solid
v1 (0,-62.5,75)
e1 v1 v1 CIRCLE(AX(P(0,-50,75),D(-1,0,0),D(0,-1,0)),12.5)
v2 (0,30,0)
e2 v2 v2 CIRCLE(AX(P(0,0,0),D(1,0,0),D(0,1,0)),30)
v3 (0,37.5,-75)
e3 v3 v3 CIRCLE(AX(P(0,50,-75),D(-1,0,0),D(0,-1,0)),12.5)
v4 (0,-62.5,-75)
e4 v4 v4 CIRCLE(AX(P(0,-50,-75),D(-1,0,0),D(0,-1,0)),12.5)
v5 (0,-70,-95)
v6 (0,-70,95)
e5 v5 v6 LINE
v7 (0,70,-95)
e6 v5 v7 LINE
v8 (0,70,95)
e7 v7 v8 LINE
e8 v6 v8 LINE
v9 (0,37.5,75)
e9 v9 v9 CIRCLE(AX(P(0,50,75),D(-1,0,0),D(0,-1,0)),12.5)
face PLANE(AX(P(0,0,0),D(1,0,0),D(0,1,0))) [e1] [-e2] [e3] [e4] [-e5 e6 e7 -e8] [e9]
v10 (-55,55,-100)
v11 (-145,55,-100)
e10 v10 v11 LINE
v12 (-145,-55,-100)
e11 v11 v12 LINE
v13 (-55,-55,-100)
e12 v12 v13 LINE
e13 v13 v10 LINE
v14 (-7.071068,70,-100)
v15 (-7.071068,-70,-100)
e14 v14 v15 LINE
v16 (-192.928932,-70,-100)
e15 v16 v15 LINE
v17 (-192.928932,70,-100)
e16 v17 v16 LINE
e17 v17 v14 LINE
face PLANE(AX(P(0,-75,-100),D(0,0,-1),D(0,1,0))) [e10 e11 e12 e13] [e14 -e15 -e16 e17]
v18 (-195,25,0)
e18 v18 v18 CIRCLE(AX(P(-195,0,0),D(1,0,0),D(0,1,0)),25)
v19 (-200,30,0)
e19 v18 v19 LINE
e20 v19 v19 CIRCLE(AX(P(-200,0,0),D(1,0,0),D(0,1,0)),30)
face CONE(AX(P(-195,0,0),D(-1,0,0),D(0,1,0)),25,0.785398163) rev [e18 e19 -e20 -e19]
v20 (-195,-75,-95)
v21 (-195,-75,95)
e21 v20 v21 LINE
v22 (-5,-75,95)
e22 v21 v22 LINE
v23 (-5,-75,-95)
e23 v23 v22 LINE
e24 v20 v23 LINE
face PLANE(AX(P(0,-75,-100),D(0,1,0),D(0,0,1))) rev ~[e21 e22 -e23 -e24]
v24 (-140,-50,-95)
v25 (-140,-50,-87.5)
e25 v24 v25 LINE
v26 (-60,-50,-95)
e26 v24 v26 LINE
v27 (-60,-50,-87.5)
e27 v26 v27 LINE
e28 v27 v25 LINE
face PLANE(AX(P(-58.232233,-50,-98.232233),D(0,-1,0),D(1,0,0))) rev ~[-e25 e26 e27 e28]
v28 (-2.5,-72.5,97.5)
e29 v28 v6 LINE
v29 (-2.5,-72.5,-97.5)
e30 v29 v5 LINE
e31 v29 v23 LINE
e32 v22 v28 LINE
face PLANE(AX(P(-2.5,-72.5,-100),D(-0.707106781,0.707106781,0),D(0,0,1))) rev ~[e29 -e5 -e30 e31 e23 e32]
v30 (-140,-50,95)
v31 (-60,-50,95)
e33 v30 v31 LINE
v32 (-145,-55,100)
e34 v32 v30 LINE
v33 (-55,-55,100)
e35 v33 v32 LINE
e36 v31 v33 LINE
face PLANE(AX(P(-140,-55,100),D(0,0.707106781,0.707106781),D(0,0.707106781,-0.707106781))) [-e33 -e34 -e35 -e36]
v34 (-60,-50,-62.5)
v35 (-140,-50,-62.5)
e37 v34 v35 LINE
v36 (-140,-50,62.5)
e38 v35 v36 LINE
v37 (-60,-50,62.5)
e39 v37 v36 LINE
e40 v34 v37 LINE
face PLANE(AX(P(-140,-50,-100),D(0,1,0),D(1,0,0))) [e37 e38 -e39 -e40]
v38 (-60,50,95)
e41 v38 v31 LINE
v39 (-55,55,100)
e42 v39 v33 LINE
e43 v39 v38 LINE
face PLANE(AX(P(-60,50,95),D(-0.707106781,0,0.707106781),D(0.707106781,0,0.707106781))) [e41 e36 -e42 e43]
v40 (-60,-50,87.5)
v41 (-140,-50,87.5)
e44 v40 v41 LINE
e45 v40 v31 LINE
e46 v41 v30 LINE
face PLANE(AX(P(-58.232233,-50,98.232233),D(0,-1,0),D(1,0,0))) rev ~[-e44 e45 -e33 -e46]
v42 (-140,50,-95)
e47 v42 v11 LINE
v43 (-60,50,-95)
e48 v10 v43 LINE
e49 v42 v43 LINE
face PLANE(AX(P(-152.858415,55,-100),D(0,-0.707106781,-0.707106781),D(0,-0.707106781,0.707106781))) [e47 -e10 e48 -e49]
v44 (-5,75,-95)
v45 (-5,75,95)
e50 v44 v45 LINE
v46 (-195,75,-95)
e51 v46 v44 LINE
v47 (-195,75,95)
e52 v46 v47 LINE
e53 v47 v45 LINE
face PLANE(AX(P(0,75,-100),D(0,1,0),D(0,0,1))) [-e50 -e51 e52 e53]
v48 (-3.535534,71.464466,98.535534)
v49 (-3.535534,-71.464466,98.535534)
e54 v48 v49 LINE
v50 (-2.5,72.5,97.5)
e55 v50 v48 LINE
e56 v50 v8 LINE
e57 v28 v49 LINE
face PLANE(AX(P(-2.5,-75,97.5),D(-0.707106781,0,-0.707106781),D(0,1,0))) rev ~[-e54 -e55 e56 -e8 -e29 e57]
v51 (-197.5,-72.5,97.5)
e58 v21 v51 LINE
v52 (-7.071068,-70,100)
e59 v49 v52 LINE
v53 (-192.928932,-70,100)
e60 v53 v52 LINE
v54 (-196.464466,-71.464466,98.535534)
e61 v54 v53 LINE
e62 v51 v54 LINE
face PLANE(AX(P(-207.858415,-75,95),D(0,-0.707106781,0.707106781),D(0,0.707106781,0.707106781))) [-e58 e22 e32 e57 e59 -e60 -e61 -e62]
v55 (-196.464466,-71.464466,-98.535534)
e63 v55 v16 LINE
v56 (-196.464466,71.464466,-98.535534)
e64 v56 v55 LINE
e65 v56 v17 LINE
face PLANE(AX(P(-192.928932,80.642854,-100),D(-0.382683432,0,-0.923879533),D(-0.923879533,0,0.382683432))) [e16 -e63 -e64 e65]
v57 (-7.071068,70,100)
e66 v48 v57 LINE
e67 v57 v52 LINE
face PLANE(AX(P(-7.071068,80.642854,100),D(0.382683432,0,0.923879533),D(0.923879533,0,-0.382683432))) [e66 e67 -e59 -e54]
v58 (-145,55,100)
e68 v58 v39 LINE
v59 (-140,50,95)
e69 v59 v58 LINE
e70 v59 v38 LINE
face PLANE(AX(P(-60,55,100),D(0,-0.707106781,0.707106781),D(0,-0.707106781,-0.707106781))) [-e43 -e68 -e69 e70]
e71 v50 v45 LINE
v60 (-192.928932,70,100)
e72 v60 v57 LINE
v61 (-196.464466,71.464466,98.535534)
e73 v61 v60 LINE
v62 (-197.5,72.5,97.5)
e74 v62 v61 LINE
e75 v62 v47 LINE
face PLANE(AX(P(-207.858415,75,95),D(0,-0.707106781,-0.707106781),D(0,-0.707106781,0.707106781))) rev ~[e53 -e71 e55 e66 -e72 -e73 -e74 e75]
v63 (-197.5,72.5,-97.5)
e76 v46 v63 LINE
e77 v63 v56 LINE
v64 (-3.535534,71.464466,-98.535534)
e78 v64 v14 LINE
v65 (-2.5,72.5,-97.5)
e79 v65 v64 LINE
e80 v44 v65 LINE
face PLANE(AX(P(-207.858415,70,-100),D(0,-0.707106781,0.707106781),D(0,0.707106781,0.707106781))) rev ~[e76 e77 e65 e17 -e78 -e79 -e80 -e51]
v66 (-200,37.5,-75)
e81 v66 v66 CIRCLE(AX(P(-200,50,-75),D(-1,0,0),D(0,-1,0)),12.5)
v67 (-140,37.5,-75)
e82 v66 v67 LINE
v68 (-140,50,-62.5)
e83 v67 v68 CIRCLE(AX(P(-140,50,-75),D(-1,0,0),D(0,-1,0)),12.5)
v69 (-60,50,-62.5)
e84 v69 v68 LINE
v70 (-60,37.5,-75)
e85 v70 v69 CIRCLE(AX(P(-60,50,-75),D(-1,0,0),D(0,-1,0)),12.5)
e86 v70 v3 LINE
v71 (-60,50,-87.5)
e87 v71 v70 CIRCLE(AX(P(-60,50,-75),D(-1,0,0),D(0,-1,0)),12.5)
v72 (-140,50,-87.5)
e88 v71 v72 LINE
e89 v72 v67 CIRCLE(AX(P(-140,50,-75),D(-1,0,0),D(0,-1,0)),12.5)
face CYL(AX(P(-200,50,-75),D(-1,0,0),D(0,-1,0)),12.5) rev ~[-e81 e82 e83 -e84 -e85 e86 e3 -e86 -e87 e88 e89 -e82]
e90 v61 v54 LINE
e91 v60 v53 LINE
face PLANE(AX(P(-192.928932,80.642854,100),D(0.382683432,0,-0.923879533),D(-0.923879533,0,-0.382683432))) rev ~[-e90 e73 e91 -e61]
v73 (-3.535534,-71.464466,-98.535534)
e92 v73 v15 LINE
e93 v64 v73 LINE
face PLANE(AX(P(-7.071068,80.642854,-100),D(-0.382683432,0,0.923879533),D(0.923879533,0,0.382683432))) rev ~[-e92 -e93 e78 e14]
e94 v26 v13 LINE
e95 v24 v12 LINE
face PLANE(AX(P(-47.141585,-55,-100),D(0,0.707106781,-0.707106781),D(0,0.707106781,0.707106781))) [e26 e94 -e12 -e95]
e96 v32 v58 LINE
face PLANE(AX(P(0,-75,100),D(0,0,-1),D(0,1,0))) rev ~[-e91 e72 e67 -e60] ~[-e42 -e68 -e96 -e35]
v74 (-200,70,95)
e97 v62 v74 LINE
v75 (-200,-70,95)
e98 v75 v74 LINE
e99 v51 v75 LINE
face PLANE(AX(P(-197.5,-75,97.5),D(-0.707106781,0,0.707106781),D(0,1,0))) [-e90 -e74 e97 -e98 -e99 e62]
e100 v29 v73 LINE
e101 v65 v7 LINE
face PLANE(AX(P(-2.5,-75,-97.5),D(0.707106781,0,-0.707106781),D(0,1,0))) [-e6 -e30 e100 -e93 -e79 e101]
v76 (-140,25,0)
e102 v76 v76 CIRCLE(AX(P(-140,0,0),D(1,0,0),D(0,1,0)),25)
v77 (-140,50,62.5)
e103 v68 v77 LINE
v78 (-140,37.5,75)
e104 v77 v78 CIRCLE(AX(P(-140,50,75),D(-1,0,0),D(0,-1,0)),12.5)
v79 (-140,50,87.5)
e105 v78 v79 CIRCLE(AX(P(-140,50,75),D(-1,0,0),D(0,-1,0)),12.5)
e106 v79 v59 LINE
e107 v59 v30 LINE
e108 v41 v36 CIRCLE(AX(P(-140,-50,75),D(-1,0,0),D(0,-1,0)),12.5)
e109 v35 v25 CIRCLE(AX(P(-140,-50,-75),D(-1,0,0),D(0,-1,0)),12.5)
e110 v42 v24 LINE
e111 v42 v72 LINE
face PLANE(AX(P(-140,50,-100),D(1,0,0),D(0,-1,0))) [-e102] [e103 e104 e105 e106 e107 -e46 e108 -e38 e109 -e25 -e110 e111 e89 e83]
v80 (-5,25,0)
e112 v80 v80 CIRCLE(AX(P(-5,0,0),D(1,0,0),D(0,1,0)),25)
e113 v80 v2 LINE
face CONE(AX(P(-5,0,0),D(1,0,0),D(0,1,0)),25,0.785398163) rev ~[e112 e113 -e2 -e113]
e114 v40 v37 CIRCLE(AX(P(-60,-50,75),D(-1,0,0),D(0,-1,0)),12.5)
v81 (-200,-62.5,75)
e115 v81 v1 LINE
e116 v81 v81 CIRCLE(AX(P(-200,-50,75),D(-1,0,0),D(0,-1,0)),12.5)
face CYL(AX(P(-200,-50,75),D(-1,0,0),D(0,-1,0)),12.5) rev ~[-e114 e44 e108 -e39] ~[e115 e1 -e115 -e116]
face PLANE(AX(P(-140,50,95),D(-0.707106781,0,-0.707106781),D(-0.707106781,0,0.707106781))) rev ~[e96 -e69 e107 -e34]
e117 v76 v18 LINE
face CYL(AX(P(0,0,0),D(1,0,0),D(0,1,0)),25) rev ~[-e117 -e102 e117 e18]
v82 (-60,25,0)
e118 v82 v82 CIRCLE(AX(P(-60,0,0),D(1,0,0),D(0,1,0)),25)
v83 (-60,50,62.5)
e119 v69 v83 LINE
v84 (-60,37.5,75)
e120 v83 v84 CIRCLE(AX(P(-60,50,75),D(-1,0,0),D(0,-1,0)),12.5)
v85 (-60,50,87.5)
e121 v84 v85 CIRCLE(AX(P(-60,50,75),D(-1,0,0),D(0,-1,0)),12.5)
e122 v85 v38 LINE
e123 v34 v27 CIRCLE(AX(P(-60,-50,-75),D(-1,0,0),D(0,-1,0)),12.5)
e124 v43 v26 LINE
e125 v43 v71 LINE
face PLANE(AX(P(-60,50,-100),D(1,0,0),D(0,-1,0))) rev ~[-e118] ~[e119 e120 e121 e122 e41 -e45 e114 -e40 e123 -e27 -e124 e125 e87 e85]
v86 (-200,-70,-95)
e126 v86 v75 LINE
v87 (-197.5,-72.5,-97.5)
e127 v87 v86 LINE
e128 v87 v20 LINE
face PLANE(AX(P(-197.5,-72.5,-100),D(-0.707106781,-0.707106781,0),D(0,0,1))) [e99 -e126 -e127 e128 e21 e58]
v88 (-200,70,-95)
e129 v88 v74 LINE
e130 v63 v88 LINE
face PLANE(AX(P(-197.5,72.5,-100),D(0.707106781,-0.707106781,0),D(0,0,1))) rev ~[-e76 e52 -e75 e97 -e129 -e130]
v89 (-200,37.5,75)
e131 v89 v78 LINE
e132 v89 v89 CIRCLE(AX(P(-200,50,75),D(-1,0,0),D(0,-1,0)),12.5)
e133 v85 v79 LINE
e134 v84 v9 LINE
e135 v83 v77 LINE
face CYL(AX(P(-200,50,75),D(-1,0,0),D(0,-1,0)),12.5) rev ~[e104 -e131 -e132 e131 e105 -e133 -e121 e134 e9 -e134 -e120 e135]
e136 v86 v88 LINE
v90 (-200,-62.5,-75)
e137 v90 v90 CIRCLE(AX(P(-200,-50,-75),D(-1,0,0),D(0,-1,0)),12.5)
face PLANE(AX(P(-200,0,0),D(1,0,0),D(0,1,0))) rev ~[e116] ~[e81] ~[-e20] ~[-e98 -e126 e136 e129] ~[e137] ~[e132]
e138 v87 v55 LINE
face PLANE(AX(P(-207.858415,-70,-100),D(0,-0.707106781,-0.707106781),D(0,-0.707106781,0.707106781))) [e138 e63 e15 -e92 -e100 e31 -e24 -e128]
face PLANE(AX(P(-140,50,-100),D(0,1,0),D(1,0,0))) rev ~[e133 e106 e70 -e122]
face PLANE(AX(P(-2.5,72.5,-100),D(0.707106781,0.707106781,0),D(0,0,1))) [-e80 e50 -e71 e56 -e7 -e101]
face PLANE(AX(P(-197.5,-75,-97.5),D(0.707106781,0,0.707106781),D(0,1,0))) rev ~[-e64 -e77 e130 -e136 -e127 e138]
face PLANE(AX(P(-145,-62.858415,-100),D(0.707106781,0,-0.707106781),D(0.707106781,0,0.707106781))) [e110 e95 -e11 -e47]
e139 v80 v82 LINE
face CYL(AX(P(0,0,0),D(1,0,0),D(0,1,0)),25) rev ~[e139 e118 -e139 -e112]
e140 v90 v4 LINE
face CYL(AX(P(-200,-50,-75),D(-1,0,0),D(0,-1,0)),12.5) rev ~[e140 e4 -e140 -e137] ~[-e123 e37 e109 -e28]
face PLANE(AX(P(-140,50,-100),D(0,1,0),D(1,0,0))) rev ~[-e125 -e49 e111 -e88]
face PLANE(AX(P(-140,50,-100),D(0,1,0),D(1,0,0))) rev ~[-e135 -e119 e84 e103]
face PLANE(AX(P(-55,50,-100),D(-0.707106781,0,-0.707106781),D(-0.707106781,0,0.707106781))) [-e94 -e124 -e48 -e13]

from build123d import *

# Parameters (mm, degrees)
F0_W         = 150
F0_H         = 200
F0_R         = 25
F1_DEPTH     = 200
F2_SIZE      = 5
F3_R         = 12.5
F4_DEPTH     = 200.001
F5_W         = 80
F5_H         = 100
F6_DEPTH     = 200.001
F7_T1_DEPTH  = 215.7168298797
F7_T3_DEPTH  = 161.2857086021
F7_T5_DEPTH  = 100
F7_T7_DEPTH  = 80
F7_T13_DEPTH = 112.8584149398
F7_T17_DEPTH = 92.8584149398
F7_T24_DEPTH = 112.8584149398
F7_T28_DEPTH = 92.8584149398
F7_T35_DEPTH = 92.8584149398
F7_T39_DEPTH = 112.8584149398
F7_T46_DEPTH = 112.8584149398
F7_T50_DEPTH = 92.8584149398
F7_T57_DEPTH = 112.8584149398
F7_T61_DEPTH = 92.8584149398
F7_T68_DEPTH = 112.8584149398
F7_T72_DEPTH = 92.8584149398
F7_T79_DEPTH = 112.8584149398
F7_T83_DEPTH = 92.8584149398
F7_T90_DEPTH = 112.8584149398
F7_T94_DEPTH = 92.8584149398


# Not quite as in the source:
# - a fillet or chamfer that OpenCascade refuses, or shapes differently, is made with other operations: its cross-section is extruded or revolved along the edge and cut away or added


with BuildPart() as f1:
    # F0 (on Right) → F1 (new body)
    with BuildSketch(Plane.YZ):
        Rectangle(F0_W, F0_H)
        Circle(F0_R, mode=Mode.SUBTRACT)
    extrude(amount=-F1_DEPTH)

    # F2
    f2_edges = [f1.edges().sort_by_distance(p)[0] for p in [
        (0, 0, -100),
        (0, 75, 0),
        (0, 0, 100),
        (0, -75, 0),
        (0, -25, 0),
        (-200, 0, -100),
        (-200, 75, 0),
        (-200, 0, 100),
        (-200, -75, 0),
        (-200, -25, 0),
    ]]
    chamfer(f2_edges, length=F2_SIZE)

    # F3 (on face) → F4 (cut, through all)
    with BuildSketch(Plane(origin=(-200, 0, 0), x_dir=(0, -1, 0), z_dir=(-1, 0, 0))):
        with Locations((-50, -75)):
            Circle(F3_R)
        with Locations((-50, 75)):
            Circle(F3_R)
        with Locations((50, -75)):
            Circle(F3_R)
        with Locations((50, 75)):
            Circle(F3_R)
    extrude(amount=-F4_DEPTH, mode=Mode.SUBTRACT)

    # F5 (on face) → F6 (cut, through all)
    with BuildSketch(Plane(origin=(0, 0, -100), x_dir=(1, 0, 0), z_dir=(0, 0, -1))):
        with Locations((-100, 0)):
            Rectangle(F5_W, F5_H)
    extrude(amount=-F6_DEPTH, mode=Mode.SUBTRACT)

    # F7: chamfer of 5 on 16 edges, made by hand

    # F7_s2 → F7_t1 (cut)
    with BuildSketch(Plane.YZ.offset(-207.8584149398)):
        Polygon((-70, -100), (-75, -95), (-75, -100), align=None)
        Polygon((70, -100), (75, -95), (75, -100), align=None)
        Polygon((75, 95), (70, 100), (75, 100), align=None)
        Polygon((-75, 95), (-70, 100), (-75, 100), align=None)
    extrude(amount=F7_T1_DEPTH, mode=Mode.SUBTRACT)

    # F7_s4 → F7_t3 (cut)
    with BuildSketch(Plane.XZ.offset(-80.6428543011)):
        Polygon((-7.0710678119, -100), (-3.5355339059, -98.5355339059), (-5, -100), align=None)
        Polygon((-192.9289321881, -100), (-196.4644660941, -98.5355339059), (-195, -100), align=None)
        Polygon((-7.0710678119, 100), (-3.5355339059, 98.5355339059), (-5, 100), align=None)
        Polygon((-192.9289321881, 100), (-196.4644660941, 98.5355339059), (-195, 100), align=None)
    extrude(amount=F7_T3_DEPTH, mode=Mode.SUBTRACT)

    # F7_s6 → F7_t5 (cut)
    with BuildSketch(Plane.XZ.offset(-50)):
        Polygon((-55, -100), (-60, -95), (-60, -100), align=None)
        Polygon((-145, -100), (-140, -95), (-140, -100), align=None)
        Polygon((-60, 95), (-55, 100), (-60, 100), align=None)
        Polygon((-140, 95), (-145, 100), (-140, 100), align=None)
    extrude(amount=F7_T5_DEPTH, mode=Mode.SUBTRACT)

    # F7_s8 → F7_t7 (cut)
    with BuildSketch(Plane.YZ.offset(-140)):
        Polygon((-55, -100), (-50, -95), (-50, -100), align=None)
        Polygon((55, -100), (50, -95), (50, -100), align=None)
        Polygon((55, 100), (50, 95), (50, 100), align=None)
        Polygon((-55, 100), (-50, 95), (-50, 100), align=None)
    extrude(amount=F7_T7_DEPTH, mode=Mode.SUBTRACT)


with BuildPart() as f7_tool11:
    # F7_s12 → F7_t13 (new body)
    with BuildSketch(Plane.XZ.offset(-62.8584149398)):
        Polygon((-55, -100), (-60, -95), (-60, -100), align=None)
    extrude(amount=F7_T13_DEPTH)

    split(bisect_by=Plane.XZ.offset(-50), keep=Keep.BOTTOM)


with BuildPart() as f7_tool15:
    # F7_s16 → F7_t17 (new body)
    with BuildSketch(Plane.YZ.offset(-140)):
        Polygon((55, -100), (50, -95), (50, -100), align=None)
    extrude(amount=F7_T17_DEPTH)

    split(bisect_by=Plane.YZ.offset(-60), keep=Keep.TOP)


with BuildPart() as f7_tool11_1:
    add(f7_tool11.part)

    # F7_t19: intersect F7_tool15
    add(f7_tool15.part, mode=Mode.INTERSECT)


with BuildPart() as f1_1:
    add(f1.part)

    # F7_t9: cut F7_tool11
    add(f7_tool11_1.part, mode=Mode.SUBTRACT)


with BuildPart() as f7_tool22:
    # F7_s23 → F7_t24 (new body)
    with BuildSketch(Plane.XZ.offset(-50)):
        Polygon((-55, -100), (-60, -95), (-60, -100), align=None)
    extrude(amount=F7_T24_DEPTH)

    split(bisect_by=Plane.XZ.offset(50), keep=Keep.TOP)


with BuildPart() as f7_tool26:
    # F7_s27 → F7_t28 (new body)
    with BuildSketch(Plane.YZ.offset(-47.1415850602)):
        Polygon((-55, -100), (-50, -95), (-50, -100), align=None)
    extrude(amount=-F7_T28_DEPTH)

    split(bisect_by=Plane.YZ.offset(-60), keep=Keep.TOP)


with BuildPart() as f7_tool22_1:
    add(f7_tool22.part)

    # F7_t30: intersect F7_tool26
    add(f7_tool26.part, mode=Mode.INTERSECT)


with BuildPart() as f1_2:
    add(f1_1.part)

    # F7_t20: cut F7_tool22
    add(f7_tool22_1.part, mode=Mode.SUBTRACT)


with BuildPart() as f7_tool33:
    # F7_s34 → F7_t35 (new body)
    with BuildSketch(Plane.YZ.offset(-60)):
        Polygon((-55, -100), (-50, -95), (-50, -100), align=None)
    extrude(amount=-F7_T35_DEPTH)

    split(bisect_by=Plane.YZ.offset(-140), keep=Keep.BOTTOM)


with BuildPart() as f7_tool37:
    # F7_s38 → F7_t39 (new body)
    with BuildSketch(Plane.XZ.offset(62.8584149398)):
        Polygon((-145, -100), (-140, -95), (-140, -100), align=None)
    extrude(amount=-F7_T39_DEPTH)

    split(bisect_by=Plane.XZ.offset(50), keep=Keep.TOP)


with BuildPart() as f7_tool33_1:
    add(f7_tool33.part)

    # F7_t41: intersect F7_tool37
    add(f7_tool37.part, mode=Mode.INTERSECT)


with BuildPart() as f1_3:
    add(f1_2.part)

    # F7_t31: cut F7_tool33
    add(f7_tool33_1.part, mode=Mode.SUBTRACT)


with BuildPart() as f7_tool44:
    # F7_s45 → F7_t46 (new body)
    with BuildSketch(Plane.XZ.offset(50)):
        Polygon((-145, -100), (-140, -95), (-140, -100), align=None)
    extrude(amount=-F7_T46_DEPTH)

    split(bisect_by=Plane.XZ.offset(-50), keep=Keep.BOTTOM)


with BuildPart() as f7_tool48:
    # F7_s49 → F7_t50 (new body)
    with BuildSketch(Plane.YZ.offset(-152.8584149398)):
        Polygon((55, -100), (50, -95), (50, -100), align=None)
    extrude(amount=F7_T50_DEPTH)

    split(bisect_by=Plane.YZ.offset(-140), keep=Keep.BOTTOM)


with BuildPart() as f7_tool44_1:
    add(f7_tool44.part)

    # F7_t52: intersect F7_tool48
    add(f7_tool48.part, mode=Mode.INTERSECT)


with BuildPart() as f1_4:
    add(f1_3.part)

    # F7_t42: cut F7_tool44
    add(f7_tool44_1.part, mode=Mode.SUBTRACT)


with BuildPart() as f7_tool55:
    # F7_s56 → F7_t57 (new body)
    with BuildSketch(Plane.XZ.offset(62.8584149398)):
        Polygon((-60, 95), (-55, 100), (-60, 100), align=None)
    extrude(amount=-F7_T57_DEPTH)

    split(bisect_by=Plane.XZ.offset(50), keep=Keep.TOP)


with BuildPart() as f7_tool59:
    # F7_s60 → F7_t61 (new body)
    with BuildSketch(Plane.YZ.offset(-140)):
        Polygon((-55, 100), (-50, 95), (-50, 100), align=None)
    extrude(amount=F7_T61_DEPTH)

    split(bisect_by=Plane.YZ.offset(-60), keep=Keep.TOP)


with BuildPart() as f7_tool55_1:
    add(f7_tool55.part)

    # F7_t63: intersect F7_tool59
    add(f7_tool59.part, mode=Mode.INTERSECT)


with BuildPart() as f1_5:
    add(f1_4.part)

    # F7_t53: cut F7_tool55
    add(f7_tool55_1.part, mode=Mode.SUBTRACT)


with BuildPart() as f7_tool66:
    # F7_s67 → F7_t68 (new body)
    with BuildSketch(Plane.XZ.offset(50)):
        Polygon((-60, 95), (-55, 100), (-60, 100), align=None)
    extrude(amount=-F7_T68_DEPTH)

    split(bisect_by=Plane.XZ.offset(-50), keep=Keep.BOTTOM)


with BuildPart() as f7_tool70:
    # F7_s71 → F7_t72 (new body)
    with BuildSketch(Plane.YZ.offset(-47.1415850602)):
        Polygon((55, 100), (50, 95), (50, 100), align=None)
    extrude(amount=-F7_T72_DEPTH)

    split(bisect_by=Plane.YZ.offset(-60), keep=Keep.TOP)


with BuildPart() as f7_tool66_1:
    add(f7_tool66.part)

    # F7_t74: intersect F7_tool70
    add(f7_tool70.part, mode=Mode.INTERSECT)


with BuildPart() as f1_6:
    add(f1_5.part)

    # F7_t64: cut F7_tool66
    add(f7_tool66_1.part, mode=Mode.SUBTRACT)


with BuildPart() as f7_tool77:
    # F7_s78 → F7_t79 (new body)
    with BuildSketch(Plane.XZ.offset(-62.8584149398)):
        Polygon((-140, 95), (-145, 100), (-140, 100), align=None)
    extrude(amount=F7_T79_DEPTH)

    split(bisect_by=Plane.XZ.offset(-50), keep=Keep.BOTTOM)


with BuildPart() as f7_tool81:
    # F7_s82 → F7_t83 (new body)
    with BuildSketch(Plane.YZ.offset(-60)):
        Polygon((55, 100), (50, 95), (50, 100), align=None)
    extrude(amount=-F7_T83_DEPTH)

    split(bisect_by=Plane.YZ.offset(-140), keep=Keep.BOTTOM)


with BuildPart() as f7_tool77_1:
    add(f7_tool77.part)

    # F7_t85: intersect F7_tool81
    add(f7_tool81.part, mode=Mode.INTERSECT)


with BuildPart() as f1_7:
    add(f1_6.part)

    # F7_t75: cut F7_tool77
    add(f7_tool77_1.part, mode=Mode.SUBTRACT)


with BuildPart() as f7_tool88:
    # F7_s89 → F7_t90 (new body)
    with BuildSketch(Plane.XZ.offset(-50)):
        Polygon((-140, 95), (-145, 100), (-140, 100), align=None)
    extrude(amount=F7_T90_DEPTH)

    split(bisect_by=Plane.XZ.offset(50), keep=Keep.TOP)


with BuildPart() as f7_tool92:
    # F7_s93 → F7_t94 (new body)
    with BuildSketch(Plane.YZ.offset(-152.8584149398)):
        Polygon((-55, 100), (-50, 95), (-50, 100), align=None)
    extrude(amount=F7_T94_DEPTH)

    split(bisect_by=Plane.YZ.offset(-140), keep=Keep.BOTTOM)


with BuildPart() as f7_tool88_1:
    add(f7_tool88.part)

    # F7_t96: intersect F7_tool92
    add(f7_tool92.part, mode=Mode.INTERSECT)


with BuildPart() as f1_8:
    add(f1_7.part)

    # F7_t86: cut F7_tool88
    add(f7_tool88_1.part, mode=Mode.SUBTRACT)


solid = f1_8.part
